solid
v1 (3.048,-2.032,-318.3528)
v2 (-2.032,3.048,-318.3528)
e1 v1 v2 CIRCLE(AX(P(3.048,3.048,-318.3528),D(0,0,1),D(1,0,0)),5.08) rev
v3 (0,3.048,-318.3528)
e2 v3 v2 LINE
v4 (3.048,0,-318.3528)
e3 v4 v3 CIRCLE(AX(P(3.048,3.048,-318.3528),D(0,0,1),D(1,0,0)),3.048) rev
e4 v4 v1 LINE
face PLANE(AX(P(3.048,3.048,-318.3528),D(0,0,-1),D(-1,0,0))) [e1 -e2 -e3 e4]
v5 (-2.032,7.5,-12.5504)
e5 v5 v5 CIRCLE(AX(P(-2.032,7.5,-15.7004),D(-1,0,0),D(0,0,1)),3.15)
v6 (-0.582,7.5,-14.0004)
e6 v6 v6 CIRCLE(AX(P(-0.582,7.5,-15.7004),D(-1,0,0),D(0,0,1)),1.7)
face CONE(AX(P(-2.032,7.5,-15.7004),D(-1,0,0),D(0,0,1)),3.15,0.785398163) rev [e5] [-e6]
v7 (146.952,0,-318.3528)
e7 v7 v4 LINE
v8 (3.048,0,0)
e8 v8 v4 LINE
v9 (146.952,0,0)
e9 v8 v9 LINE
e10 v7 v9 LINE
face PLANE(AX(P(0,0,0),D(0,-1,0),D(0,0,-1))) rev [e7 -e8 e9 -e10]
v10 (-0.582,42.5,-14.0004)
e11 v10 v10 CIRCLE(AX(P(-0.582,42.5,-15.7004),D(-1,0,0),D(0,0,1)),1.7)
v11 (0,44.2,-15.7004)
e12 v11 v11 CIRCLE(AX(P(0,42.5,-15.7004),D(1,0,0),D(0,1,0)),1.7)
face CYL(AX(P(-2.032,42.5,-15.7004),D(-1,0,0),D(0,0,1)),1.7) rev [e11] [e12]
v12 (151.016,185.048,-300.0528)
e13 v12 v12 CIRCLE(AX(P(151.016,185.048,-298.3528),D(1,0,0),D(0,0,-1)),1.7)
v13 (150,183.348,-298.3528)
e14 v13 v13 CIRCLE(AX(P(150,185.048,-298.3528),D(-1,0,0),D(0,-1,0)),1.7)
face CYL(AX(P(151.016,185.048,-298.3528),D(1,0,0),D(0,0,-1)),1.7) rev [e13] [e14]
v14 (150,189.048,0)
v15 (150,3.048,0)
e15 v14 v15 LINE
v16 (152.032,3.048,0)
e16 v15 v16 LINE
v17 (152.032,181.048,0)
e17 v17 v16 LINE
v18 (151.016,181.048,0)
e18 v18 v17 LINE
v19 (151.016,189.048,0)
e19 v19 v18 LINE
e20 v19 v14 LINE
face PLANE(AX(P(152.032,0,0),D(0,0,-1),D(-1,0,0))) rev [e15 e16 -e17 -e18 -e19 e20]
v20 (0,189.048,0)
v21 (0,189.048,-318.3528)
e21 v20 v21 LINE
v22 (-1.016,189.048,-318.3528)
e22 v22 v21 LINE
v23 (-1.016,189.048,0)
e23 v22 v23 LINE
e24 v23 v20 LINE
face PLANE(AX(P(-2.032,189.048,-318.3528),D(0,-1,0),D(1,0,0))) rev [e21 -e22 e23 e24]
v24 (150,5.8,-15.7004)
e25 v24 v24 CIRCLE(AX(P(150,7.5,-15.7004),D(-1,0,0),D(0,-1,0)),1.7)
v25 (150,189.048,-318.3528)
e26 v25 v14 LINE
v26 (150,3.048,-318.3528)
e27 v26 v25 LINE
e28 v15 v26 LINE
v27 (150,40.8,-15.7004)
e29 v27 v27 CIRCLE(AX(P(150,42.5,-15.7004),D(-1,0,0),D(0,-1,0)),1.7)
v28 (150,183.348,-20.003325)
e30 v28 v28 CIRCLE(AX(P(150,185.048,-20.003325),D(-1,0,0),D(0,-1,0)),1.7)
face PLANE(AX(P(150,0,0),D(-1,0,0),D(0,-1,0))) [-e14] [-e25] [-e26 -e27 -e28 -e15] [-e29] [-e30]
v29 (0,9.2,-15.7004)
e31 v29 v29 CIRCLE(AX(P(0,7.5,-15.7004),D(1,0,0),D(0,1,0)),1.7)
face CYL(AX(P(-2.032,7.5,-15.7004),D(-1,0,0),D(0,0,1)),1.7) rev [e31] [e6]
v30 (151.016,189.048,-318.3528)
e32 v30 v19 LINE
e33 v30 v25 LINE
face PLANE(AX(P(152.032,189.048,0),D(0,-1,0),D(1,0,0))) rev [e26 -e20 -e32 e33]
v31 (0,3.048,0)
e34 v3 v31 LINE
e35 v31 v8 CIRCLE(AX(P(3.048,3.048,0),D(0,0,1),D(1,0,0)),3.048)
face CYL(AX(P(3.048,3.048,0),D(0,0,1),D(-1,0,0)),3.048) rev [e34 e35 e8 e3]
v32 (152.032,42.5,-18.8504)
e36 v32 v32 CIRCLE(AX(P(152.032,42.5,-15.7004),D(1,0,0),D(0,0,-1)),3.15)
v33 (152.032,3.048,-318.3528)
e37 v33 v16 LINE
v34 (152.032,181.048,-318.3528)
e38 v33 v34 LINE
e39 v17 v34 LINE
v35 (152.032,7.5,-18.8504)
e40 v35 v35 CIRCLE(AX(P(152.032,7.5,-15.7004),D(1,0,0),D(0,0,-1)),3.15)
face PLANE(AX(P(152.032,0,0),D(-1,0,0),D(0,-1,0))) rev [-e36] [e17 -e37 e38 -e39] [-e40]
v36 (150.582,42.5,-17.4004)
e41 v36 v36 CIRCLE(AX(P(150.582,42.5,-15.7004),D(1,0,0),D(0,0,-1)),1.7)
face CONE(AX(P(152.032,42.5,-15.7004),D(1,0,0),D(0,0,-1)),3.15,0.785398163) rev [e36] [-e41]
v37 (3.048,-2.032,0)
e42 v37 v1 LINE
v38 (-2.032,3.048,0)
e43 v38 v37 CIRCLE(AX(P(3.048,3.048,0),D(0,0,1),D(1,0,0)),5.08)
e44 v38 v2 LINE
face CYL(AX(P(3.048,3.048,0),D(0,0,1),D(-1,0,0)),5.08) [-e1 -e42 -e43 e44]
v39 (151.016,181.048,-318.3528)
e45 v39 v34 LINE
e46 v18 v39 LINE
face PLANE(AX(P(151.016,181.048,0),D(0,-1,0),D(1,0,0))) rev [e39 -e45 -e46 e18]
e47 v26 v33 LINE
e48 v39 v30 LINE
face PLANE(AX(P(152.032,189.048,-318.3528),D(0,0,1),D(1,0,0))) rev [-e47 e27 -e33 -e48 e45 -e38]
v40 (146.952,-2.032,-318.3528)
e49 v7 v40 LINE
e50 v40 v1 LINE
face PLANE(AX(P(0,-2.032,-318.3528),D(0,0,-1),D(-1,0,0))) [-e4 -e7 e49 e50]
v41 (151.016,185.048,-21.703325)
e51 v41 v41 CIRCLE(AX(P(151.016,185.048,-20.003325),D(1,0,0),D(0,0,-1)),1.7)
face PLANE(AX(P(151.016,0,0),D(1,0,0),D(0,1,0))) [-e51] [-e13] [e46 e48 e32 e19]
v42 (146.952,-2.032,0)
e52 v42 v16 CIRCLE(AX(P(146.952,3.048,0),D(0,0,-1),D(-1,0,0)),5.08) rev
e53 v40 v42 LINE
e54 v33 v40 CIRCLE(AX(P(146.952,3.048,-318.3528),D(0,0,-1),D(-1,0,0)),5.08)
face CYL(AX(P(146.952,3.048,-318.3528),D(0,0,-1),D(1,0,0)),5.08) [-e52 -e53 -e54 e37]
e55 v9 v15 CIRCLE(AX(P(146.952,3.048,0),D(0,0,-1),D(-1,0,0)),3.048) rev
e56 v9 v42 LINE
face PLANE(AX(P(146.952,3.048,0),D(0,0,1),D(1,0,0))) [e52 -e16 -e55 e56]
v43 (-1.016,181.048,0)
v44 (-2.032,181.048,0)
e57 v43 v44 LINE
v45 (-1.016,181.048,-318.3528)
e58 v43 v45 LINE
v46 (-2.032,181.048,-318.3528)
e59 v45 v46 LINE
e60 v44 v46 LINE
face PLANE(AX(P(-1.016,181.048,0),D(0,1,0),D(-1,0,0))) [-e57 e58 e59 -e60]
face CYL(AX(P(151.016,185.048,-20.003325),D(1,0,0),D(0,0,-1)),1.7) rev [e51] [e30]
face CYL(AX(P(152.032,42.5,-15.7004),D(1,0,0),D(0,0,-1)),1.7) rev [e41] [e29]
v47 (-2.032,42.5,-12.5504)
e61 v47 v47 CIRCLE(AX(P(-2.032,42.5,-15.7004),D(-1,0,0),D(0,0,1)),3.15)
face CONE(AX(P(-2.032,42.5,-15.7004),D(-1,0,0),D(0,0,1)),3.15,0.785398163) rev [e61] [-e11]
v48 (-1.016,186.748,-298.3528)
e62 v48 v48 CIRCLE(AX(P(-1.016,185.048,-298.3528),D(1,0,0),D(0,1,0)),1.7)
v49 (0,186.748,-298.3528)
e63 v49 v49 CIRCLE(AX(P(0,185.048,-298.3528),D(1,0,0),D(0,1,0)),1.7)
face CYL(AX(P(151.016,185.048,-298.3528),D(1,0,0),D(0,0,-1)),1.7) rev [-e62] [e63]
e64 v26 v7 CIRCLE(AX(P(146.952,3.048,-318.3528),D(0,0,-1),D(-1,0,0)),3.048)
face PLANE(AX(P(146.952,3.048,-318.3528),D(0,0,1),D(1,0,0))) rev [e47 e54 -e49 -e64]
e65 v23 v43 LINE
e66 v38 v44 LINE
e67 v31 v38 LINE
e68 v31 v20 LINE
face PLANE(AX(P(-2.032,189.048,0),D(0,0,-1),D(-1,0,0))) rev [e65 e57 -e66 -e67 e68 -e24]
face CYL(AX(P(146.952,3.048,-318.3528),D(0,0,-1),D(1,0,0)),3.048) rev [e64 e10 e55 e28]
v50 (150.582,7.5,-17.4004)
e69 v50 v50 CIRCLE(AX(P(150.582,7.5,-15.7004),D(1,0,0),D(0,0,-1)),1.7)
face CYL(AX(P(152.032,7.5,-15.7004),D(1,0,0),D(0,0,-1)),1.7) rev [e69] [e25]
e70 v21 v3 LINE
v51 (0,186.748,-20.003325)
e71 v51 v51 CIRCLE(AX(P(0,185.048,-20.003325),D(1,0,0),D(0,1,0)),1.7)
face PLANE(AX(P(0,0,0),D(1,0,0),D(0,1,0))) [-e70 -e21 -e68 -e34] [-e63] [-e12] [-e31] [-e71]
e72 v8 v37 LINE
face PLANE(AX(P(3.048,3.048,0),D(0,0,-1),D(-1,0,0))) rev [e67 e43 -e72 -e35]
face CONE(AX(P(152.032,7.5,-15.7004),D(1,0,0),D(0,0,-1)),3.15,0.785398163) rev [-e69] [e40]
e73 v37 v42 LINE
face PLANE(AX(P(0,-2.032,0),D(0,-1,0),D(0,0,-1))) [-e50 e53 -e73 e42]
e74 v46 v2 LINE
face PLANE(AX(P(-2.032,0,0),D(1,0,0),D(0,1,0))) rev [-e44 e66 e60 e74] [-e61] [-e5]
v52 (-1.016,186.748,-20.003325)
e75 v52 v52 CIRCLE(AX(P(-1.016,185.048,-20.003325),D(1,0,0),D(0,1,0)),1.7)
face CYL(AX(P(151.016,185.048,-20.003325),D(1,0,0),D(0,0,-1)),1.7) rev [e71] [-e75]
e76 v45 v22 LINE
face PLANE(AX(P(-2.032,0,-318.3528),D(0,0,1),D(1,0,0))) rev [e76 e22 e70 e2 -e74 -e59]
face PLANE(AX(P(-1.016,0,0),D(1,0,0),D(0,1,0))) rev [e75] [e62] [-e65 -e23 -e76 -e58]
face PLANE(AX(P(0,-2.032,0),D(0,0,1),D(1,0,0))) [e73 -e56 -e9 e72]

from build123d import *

# Parameters (mm, degrees)
SKETCH1_W                                      = 150
SKETCH1_H                                      = 318.3528
BASE_FLANGE1_DEPTH                             = 2.032
EDGE_FLANGE1_STRIP_W                           = 14.224
EDGE_FLANGE1_STRIP_H                           = 2.032
EDGE_FLANGE1_STRIP_CUT_DEPTH                   = 318.3528
EDGE_FLANGE1_STRIP_2_W                         = 14.224
EDGE_FLANGE1_STRIP_2_H                         = 2.032
EDGE_FLANGE1_STRIP_CUT_2_DEPTH                 = 318.3528
EDGE_FLANGE1_DEPTH                             = 318.3528
EDGE_FLANGE1_BEND_DEPTH                        = 318.3528
SKETCH9_W                                      = 318.3528
SKETCH9_H                                      = 8
CUT_EXTRUDE1_DEPTH                             = 1.016
SKETCH10_W                                     = 318.3528
SKETCH10_H                                     = 8
CUT_EXTRUDE3_DEPTH                             = 1.016
M3_CLEARANCE_HOLE1_D                           = 3.4
CSK_FOR_M3_FLAT_HEAD_MACHINE_SCREW1_AT_2_COUNT = 2
CSK_FOR_M3_FLAT_HEAD_MACHINE_SCREW1_AT_2_PITCH = 35
CSK_FOR_M3_FLAT_HEAD_MACHINE_SCREW2_AT_2_COUNT = 2
CSK_FOR_M3_FLAT_HEAD_MACHINE_SCREW2_AT_2_PITCH = 35


# Sheet-metal steps are written as plain solids
with BuildPart() as part:
    # Sketch1 → Base-Flange1 (new body)
    with BuildSketch(Plane(origin=(0, 0, 0), x_dir=(1, 0, 0), z_dir=(0, 1, 0))):
        with Locations((75, 159.1764)):
            Rectangle(SKETCH1_W, SKETCH1_H)
    extrude(amount=-BASE_FLANGE1_DEPTH)

    # Edge-Flange1 strip (across the edge) → Edge-Flange1 strip cut (cut)
    with BuildSketch(Plane(origin=(150, 0, 0), x_dir=(-1, 0, 0), z_dir=(0, 0, -1))):
        with Locations((-4.064, -1.016)):
            Rectangle(EDGE_FLANGE1_STRIP_W, EDGE_FLANGE1_STRIP_H)
    extrude(amount=EDGE_FLANGE1_STRIP_CUT_DEPTH, mode=Mode.SUBTRACT)

    # Edge-Flange1 strip 2 (across the edge) → Edge-Flange1 strip cut 2 (cut)
    with BuildSketch(Plane.XY.offset(-318.3528)):
        with Locations((-4.064, -1.016)):
            Rectangle(EDGE_FLANGE1_STRIP_2_W, EDGE_FLANGE1_STRIP_2_H)
    extrude(amount=EDGE_FLANGE1_STRIP_CUT_2_DEPTH, mode=Mode.SUBTRACT)

    # Edge-Flange1 section (across the edge) → Edge-Flange1 (add)
    with BuildSketch(Plane(origin=(150, 0, 0), x_dir=(-1, 0, 0), z_dir=(0, 0, -1))):
        with BuildLine():
            Line((-2.032, 3.048), (-2.032, 189.048))
            Line((-2.032, 189.048), (0, 189.048))
            Line((0, 189.048), (0, 3.048))
            ThreePointArc((0, 3.048), (0.892738531, 0.892738531), (3.048, 0))
            Line((3.048, 0), (3.048, -2.032))
            ThreePointArc((3.048, -2.032), (-0.544102448, -0.544102448), (-2.032, 3.048))
        make_face()
    extrude(amount=EDGE_FLANGE1_DEPTH)

    # Edge-Flange1 section 2 (across the edge) → Edge-Flange1 bend (add)
    with BuildSketch(Plane.XY.offset(-318.3528)):
        with BuildLine():
            Line((-2.032, 3.048), (-2.032, 189.048))
            Line((-2.032, 189.048), (0, 189.048))
            Line((0, 189.048), (0, 3.048))
            ThreePointArc((0, 3.048), (0.892738531, 0.892738531), (3.048, 0))
            Line((3.048, 0), (3.048, -2.032))
            ThreePointArc((3.048, -2.032), (-0.544102448, -0.544102448), (-2.032, 3.048))
        make_face()
    extrude(amount=EDGE_FLANGE1_BEND_DEPTH)

    # Sketch9 → Cut-Extrude1 (cut)
    with BuildSketch(Plane(origin=(152.032, 0, 0), x_dir=(0, 0, -1), z_dir=(1, 0, 0))):
        with Locations((159.1764, 185.048)):
            Rectangle(SKETCH9_W, SKETCH9_H)
    extrude(amount=-CUT_EXTRUDE1_DEPTH, mode=Mode.SUBTRACT)

    # Sketch10 → Cut-Extrude3 (cut)
    with BuildSketch(Plane(origin=(-2.032, 0, -3.175), x_dir=(0, 0, -1), z_dir=(1, 0, 0))):
        with Locations((156.0014, 185.048)):
            Rectangle(SKETCH10_W, SKETCH10_H)
    extrude(amount=CUT_EXTRUDE3_DEPTH, mode=Mode.SUBTRACT)

    # M3 Clearance Hole1 (through all)
    with Locations(Plane(origin=(151.016, 0, 0), x_dir=(0, 0, -1), z_dir=(1, 0, 0))):
        with Locations((20.003324657, 185.048), (298.3528, 185.048)):
            Hole(M3_CLEARANCE_HOLE1_D / 2)

    # Sketch20 → CSK for M3 Flat Head Machine Screw1 (revolve, cut)
    with BuildSketch(Plane(origin=(152.032, 42.5, -15.7004), x_dir=(0, 0, -1), z_dir=(0, 1, 0))):
        Polygon((0, 0), (0, 2.032), (1.7, 2.032), (1.7, 1.45), (3.15, 0), align=None)
    csk_for_m3_flat_head_machine_screw1 = revolve(axis=Axis((158.382, 42.5, -15.7004), (-1, 0, 0)), mode=Mode.SUBTRACT)

    # CSK for M3 Flat Head Machine Screw1 at 2: CSK for M3 Flat Head Machine Screw1 ×2
    with Locations(*[(0, -i * CSK_FOR_M3_FLAT_HEAD_MACHINE_SCREW1_AT_2_PITCH, 0) for i in range(1, CSK_FOR_M3_FLAT_HEAD_MACHINE_SCREW1_AT_2_COUNT)]):
        add(csk_for_m3_flat_head_machine_screw1, mode=Mode.SUBTRACT)

    # Sketch23 → CSK for M3 Flat Head Machine Screw2 (revolve, cut)
    with BuildSketch(Plane(origin=(-2.032, 42.5, -15.7004), x_dir=(0, 0, 1), z_dir=(0, 1, 0))):
        Polygon((0, 0), (0, 2.032), (1.7, 2.032), (1.7, 1.45), (3.15, 0), align=None)
    csk_for_m3_flat_head_machine_screw2 = revolve(axis=Axis((-8.382, 42.5, -15.7004), (1, 0, 0)), mode=Mode.SUBTRACT)

    # CSK for M3 Flat Head Machine Screw2 at 2: CSK for M3 Flat Head Machine Screw2 ×2
    with Locations(*[(0, -i * CSK_FOR_M3_FLAT_HEAD_MACHINE_SCREW2_AT_2_PITCH, 0) for i in range(1, CSK_FOR_M3_FLAT_HEAD_MACHINE_SCREW2_AT_2_COUNT)]):
        add(csk_for_m3_flat_head_machine_screw2, mode=Mode.SUBTRACT)


solid = part.part
